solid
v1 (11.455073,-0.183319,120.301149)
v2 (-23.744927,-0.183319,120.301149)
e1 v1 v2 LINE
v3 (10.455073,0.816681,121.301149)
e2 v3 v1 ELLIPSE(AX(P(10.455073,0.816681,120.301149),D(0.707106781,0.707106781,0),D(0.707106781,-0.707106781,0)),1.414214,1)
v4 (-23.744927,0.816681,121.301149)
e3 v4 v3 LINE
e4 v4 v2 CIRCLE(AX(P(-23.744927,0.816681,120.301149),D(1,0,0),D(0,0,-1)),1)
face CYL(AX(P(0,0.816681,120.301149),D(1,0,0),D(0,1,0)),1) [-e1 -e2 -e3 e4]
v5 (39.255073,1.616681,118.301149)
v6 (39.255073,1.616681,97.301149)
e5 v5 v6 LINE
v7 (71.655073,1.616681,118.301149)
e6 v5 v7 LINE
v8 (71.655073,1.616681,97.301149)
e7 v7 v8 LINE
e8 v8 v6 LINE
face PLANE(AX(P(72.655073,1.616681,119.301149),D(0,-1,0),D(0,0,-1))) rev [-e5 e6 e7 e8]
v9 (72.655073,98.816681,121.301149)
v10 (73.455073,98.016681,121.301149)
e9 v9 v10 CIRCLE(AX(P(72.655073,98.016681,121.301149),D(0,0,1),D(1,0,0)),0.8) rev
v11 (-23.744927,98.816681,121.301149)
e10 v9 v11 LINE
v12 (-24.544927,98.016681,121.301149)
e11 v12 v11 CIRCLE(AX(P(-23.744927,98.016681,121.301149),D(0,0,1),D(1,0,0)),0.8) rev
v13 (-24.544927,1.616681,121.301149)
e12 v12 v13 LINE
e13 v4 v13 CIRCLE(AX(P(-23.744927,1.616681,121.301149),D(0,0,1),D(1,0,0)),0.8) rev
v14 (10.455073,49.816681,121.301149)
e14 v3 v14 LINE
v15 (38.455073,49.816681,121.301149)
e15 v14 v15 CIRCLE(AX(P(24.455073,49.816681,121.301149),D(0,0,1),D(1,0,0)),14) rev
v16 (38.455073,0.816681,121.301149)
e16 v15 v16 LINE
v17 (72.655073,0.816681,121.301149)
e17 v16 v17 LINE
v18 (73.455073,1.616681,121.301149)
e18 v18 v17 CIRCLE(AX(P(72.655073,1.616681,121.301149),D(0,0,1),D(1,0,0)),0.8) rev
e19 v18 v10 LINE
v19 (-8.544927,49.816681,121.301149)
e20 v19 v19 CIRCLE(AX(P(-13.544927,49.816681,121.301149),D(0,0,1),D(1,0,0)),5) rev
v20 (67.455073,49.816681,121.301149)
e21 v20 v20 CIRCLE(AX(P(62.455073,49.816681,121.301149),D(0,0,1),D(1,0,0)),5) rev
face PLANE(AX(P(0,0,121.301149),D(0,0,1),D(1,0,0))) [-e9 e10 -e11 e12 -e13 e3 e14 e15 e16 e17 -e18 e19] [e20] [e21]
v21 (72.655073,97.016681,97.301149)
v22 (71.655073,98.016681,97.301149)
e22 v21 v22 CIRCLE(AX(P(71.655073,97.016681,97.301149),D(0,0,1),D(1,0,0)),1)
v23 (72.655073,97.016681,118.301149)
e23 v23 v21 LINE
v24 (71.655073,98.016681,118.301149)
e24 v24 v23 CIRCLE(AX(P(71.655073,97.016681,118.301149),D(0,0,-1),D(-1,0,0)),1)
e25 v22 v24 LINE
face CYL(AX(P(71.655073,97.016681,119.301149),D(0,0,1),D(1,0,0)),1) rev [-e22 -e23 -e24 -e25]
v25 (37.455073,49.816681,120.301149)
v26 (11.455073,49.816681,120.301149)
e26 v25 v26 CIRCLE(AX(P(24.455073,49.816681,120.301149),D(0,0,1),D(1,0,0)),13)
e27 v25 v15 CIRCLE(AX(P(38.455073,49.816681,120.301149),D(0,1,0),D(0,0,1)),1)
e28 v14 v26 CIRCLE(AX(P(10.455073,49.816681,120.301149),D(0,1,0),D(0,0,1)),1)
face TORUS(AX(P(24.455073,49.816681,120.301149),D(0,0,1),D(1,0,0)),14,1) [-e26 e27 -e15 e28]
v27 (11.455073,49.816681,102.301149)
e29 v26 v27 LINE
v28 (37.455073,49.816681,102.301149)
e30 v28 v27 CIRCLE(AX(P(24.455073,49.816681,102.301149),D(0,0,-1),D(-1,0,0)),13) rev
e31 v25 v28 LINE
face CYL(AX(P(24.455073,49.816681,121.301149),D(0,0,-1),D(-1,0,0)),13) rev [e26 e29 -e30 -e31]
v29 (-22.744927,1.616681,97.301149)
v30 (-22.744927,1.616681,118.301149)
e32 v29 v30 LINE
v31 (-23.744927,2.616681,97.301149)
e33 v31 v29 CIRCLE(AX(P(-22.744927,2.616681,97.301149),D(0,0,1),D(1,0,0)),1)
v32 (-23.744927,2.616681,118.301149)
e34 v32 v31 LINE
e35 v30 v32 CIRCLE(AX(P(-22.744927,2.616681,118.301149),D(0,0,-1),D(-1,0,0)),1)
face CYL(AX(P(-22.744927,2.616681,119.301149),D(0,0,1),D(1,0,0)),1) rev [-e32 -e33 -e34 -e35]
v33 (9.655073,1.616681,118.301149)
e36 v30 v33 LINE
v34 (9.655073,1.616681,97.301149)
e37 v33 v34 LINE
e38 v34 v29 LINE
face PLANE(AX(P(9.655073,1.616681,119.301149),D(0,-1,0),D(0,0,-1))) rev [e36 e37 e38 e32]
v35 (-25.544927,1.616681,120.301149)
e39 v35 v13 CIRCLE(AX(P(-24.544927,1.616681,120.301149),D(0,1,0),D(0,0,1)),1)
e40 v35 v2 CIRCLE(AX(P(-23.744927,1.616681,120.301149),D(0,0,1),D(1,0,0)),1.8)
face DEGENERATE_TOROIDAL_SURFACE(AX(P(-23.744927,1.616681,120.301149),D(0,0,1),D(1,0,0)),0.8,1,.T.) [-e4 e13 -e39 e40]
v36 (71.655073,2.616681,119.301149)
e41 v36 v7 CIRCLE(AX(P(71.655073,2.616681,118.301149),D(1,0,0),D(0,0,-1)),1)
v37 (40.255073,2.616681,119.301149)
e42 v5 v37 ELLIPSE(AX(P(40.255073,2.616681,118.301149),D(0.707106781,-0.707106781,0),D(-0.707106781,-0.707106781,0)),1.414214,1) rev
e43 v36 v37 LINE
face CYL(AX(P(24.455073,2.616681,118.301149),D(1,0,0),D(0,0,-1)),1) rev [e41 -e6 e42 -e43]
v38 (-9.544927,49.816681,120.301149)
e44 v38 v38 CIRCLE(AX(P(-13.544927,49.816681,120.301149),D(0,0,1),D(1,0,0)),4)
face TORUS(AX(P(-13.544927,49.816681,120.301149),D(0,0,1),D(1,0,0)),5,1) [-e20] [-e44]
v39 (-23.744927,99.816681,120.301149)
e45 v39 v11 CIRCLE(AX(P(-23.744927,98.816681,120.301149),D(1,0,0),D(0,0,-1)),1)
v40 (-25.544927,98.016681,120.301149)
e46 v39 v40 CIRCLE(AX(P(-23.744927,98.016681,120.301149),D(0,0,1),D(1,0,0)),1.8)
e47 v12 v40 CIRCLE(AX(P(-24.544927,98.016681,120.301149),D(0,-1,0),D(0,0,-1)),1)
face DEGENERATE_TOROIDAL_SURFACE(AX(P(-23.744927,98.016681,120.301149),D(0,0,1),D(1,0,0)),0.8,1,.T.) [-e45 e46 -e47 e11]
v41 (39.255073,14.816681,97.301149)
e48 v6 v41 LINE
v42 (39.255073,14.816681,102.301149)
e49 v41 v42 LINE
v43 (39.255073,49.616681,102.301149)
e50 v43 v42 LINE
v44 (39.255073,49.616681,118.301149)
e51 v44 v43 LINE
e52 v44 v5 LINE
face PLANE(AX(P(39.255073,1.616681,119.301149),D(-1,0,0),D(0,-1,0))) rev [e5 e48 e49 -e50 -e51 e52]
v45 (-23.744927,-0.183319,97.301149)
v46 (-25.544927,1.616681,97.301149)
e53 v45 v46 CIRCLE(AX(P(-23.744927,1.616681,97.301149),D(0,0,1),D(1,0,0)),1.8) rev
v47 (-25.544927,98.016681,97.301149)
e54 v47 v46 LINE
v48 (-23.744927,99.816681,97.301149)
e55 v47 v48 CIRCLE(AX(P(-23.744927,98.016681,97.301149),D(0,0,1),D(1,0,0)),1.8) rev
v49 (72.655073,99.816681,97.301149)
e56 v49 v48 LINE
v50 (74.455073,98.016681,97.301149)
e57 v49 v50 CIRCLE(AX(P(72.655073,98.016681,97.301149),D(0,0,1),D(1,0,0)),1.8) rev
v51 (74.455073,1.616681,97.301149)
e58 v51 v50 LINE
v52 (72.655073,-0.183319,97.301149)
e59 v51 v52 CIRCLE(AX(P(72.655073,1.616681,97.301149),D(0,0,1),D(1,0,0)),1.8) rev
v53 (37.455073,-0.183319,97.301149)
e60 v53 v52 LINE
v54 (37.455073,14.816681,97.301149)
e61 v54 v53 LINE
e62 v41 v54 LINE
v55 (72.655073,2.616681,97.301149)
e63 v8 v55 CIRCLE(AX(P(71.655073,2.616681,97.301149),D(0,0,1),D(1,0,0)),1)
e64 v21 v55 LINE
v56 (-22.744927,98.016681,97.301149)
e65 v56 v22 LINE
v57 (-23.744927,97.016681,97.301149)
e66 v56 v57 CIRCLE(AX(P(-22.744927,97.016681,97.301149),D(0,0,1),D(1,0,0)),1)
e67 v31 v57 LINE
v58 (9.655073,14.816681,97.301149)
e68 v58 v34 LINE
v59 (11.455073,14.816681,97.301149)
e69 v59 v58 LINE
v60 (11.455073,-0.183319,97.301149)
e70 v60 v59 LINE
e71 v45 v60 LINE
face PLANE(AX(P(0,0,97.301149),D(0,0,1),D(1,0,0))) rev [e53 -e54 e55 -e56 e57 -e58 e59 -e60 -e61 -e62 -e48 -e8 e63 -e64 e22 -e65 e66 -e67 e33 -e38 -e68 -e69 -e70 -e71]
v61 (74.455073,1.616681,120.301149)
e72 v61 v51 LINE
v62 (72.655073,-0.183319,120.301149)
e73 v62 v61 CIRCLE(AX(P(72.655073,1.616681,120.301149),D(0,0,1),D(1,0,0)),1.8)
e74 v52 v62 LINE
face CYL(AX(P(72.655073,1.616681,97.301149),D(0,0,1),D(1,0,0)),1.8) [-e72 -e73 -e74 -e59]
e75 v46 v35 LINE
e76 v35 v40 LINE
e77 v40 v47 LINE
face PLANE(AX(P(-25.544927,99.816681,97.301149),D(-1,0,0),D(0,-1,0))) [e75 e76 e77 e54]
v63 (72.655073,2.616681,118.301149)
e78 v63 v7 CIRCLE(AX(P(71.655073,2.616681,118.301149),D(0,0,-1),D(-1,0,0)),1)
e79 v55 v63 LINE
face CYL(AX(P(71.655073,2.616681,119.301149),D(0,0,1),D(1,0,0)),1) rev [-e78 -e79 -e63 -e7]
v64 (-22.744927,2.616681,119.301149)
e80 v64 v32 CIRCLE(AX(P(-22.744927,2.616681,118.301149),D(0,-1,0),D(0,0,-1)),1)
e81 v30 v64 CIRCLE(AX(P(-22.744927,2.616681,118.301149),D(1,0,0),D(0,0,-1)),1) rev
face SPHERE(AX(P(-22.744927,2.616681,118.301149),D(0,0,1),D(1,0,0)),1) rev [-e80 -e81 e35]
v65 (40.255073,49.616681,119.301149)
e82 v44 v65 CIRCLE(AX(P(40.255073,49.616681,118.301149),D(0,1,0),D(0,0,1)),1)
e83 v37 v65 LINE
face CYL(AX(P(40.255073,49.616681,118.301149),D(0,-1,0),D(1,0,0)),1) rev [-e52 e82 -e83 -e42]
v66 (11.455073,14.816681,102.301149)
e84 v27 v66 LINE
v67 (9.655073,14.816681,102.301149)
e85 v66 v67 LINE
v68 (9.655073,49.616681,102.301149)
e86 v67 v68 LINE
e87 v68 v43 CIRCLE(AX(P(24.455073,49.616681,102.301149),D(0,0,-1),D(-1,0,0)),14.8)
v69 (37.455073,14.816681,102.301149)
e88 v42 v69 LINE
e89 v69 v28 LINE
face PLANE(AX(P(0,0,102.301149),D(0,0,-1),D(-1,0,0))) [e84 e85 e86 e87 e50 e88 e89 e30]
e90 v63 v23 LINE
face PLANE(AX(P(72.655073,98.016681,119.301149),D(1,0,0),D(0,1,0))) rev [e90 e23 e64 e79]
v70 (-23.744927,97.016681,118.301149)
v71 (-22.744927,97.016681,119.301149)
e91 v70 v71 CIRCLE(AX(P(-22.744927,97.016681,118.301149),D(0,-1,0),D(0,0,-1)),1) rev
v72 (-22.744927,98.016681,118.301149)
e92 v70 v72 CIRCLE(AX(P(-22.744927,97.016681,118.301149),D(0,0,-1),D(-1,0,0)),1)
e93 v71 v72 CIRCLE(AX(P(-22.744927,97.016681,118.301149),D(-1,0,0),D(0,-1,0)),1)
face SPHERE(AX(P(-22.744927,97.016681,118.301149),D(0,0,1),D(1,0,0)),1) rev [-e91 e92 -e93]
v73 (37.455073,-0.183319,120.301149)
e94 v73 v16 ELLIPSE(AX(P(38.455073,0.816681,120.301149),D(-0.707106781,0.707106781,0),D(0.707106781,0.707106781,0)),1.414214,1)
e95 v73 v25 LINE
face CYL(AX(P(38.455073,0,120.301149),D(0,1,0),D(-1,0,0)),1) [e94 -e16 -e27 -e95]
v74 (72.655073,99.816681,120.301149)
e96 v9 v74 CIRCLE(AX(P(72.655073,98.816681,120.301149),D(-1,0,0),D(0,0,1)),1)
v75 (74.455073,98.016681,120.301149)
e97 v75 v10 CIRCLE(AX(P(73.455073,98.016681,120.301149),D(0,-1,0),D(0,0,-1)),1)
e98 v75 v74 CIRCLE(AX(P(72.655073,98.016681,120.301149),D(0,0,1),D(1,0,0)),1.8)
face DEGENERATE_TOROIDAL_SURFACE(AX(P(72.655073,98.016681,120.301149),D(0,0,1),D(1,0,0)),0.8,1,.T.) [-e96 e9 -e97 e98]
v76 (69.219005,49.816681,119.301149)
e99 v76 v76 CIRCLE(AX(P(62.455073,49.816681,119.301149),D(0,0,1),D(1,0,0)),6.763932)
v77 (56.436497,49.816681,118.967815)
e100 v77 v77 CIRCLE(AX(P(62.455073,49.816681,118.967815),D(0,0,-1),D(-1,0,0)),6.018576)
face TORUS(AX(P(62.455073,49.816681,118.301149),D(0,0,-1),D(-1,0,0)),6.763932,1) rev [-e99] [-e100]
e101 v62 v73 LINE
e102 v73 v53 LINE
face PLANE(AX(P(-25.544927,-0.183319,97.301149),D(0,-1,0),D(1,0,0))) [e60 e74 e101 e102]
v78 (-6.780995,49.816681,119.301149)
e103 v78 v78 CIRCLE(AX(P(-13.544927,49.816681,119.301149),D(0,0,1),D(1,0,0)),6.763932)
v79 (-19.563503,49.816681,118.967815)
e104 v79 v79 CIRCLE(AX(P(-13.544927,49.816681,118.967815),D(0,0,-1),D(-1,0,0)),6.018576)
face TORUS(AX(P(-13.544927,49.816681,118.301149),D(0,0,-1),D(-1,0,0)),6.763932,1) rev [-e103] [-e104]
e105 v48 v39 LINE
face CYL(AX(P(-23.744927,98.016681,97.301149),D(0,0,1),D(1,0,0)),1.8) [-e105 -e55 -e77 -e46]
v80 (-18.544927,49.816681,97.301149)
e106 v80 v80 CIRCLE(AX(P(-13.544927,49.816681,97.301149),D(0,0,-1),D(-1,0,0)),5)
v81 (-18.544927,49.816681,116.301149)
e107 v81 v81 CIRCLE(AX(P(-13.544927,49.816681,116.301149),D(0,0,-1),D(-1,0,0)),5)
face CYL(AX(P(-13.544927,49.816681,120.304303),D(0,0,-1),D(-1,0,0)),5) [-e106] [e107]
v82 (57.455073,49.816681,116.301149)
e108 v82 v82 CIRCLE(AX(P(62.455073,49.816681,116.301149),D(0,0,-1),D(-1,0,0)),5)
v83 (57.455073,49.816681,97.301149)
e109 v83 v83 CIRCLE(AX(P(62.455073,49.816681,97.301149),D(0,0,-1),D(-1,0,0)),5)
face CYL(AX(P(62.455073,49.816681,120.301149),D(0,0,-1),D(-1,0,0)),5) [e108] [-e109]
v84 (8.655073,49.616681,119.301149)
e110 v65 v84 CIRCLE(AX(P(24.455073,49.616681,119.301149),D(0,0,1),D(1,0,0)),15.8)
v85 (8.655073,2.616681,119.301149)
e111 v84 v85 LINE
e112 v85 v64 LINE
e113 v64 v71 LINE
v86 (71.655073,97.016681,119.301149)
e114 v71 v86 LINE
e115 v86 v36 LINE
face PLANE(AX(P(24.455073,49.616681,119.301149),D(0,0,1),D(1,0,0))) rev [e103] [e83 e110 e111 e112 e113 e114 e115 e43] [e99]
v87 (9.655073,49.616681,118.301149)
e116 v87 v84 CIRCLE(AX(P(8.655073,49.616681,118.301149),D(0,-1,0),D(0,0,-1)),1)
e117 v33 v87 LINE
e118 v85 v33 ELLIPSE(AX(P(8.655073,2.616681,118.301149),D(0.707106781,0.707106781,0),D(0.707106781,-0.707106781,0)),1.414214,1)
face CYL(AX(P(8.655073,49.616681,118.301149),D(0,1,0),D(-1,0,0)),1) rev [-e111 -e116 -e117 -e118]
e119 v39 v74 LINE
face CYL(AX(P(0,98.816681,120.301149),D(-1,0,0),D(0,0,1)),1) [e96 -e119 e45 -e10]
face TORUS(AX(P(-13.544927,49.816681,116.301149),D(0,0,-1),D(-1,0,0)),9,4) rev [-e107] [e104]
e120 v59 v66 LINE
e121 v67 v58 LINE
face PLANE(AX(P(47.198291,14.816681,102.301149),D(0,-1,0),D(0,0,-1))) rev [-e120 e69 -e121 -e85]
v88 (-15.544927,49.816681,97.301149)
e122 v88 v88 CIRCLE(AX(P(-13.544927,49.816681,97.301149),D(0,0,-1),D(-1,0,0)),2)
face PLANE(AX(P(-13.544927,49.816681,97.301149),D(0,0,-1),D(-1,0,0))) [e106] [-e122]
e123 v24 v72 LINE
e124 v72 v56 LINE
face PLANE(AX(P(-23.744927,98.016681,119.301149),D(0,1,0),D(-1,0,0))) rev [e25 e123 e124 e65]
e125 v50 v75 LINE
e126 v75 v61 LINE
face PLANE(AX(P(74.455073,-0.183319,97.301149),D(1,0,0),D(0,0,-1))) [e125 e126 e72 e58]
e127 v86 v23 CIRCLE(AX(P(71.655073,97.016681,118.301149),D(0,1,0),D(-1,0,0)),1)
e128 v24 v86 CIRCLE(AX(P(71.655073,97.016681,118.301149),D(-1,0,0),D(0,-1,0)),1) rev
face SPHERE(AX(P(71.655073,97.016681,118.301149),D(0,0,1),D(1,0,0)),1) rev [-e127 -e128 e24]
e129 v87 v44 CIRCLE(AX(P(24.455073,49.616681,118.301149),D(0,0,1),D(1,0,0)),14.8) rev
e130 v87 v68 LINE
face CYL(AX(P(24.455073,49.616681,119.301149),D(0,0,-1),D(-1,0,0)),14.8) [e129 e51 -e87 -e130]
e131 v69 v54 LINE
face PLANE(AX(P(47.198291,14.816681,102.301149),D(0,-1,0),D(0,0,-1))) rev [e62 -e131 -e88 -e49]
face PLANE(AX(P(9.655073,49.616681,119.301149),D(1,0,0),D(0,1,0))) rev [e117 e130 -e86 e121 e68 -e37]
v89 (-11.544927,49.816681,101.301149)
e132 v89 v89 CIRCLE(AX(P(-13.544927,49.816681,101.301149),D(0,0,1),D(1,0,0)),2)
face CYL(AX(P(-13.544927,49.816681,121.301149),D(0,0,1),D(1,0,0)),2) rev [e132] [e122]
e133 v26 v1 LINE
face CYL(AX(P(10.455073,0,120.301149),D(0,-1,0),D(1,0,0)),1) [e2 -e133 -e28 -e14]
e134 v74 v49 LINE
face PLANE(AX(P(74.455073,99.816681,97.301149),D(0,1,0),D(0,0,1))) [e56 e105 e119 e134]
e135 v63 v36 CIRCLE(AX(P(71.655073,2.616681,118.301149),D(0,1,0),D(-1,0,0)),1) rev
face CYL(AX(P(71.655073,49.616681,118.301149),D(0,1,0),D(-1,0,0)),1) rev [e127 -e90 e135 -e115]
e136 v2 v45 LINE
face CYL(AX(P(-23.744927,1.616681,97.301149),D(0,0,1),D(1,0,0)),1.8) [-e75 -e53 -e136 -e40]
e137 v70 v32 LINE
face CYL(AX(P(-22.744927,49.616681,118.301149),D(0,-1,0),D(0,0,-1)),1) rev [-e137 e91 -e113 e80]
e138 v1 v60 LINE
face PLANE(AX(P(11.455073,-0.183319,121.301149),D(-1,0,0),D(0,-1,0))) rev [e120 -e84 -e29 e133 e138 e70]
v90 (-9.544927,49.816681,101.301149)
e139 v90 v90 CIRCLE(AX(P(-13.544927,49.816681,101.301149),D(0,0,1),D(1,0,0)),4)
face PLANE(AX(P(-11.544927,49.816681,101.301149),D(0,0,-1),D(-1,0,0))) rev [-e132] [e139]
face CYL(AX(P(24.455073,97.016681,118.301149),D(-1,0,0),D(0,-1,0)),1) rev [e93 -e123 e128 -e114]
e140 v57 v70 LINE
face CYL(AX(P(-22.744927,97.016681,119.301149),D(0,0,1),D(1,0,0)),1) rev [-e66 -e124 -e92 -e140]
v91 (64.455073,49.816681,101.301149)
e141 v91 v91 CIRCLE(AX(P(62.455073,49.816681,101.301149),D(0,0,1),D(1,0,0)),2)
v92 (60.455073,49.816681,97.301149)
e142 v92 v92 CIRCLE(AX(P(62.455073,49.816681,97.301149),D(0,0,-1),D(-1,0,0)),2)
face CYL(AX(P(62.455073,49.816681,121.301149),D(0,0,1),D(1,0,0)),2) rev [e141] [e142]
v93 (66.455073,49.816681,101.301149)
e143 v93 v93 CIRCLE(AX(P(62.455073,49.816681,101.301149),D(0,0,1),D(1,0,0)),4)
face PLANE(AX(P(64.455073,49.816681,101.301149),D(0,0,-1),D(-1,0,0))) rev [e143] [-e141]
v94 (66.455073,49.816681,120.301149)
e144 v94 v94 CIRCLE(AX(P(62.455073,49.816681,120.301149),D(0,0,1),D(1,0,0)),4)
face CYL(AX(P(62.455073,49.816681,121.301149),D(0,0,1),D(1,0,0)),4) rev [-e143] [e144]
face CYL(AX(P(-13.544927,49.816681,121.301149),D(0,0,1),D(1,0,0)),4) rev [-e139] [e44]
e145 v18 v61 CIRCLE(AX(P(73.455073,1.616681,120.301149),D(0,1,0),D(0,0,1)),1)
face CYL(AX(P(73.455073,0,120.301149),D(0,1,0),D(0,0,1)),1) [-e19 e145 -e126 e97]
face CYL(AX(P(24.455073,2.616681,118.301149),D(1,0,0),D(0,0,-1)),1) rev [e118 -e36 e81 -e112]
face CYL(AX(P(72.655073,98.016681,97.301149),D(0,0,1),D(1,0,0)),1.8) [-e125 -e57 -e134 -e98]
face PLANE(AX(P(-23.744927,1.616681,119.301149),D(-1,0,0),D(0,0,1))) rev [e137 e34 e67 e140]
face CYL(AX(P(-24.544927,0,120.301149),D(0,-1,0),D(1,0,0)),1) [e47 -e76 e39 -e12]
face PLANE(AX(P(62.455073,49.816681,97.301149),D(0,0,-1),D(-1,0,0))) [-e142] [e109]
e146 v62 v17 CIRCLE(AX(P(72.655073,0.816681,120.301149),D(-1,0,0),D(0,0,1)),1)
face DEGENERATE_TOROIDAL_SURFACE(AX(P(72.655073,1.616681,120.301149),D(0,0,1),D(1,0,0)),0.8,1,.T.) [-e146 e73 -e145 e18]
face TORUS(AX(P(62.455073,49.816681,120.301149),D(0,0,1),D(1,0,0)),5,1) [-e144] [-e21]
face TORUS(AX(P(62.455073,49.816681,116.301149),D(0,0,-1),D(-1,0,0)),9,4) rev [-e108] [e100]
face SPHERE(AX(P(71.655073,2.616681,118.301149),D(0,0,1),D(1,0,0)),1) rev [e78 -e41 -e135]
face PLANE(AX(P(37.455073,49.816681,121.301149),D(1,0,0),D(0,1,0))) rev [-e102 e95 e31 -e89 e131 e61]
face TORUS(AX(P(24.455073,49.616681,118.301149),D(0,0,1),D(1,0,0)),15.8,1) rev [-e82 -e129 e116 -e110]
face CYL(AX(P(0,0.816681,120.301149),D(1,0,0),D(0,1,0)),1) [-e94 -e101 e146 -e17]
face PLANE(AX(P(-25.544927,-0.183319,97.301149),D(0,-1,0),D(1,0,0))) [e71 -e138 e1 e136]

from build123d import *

# Parameters (mm, degrees)
SKETCH1_W           = 100
SKETCH1_H           = 100
BOSS_EXTRUDE1_DEPTH = 24
CUT_EXTRUDE1_DEPTH  = 127.818483233
CUT_EXTRUDE2_DEPTH  = 22
HOLE1_D             = 4
HOLE1_DEPTH         = 40
HOLE1_CBORE_D       = 8
HOLE1_CBORE_DEPTH   = 20
FILLET5_R           = 1
FILLET6_R           = 1
FILLET7_R           = 1.8
SKETCH10_W          = 46.470939908
SKETCH10_H          = 57.057613345
CUT_EXTRUDE4_DEPTH  = 5
FILLET8_R           = 1


with BuildPart() as part:
    # Sketch1 → Boss-Extrude1 (new body)
    with BuildSketch(Plane.XY.offset(121.301148811)):
        with Locations((24.455072694, 49.816681169)):
            Rectangle(SKETCH1_W, SKETCH1_H)
    extrude(amount=-BOSS_EXTRUDE1_DEPTH)

    # Sketch2 → Cut-Extrude1 (cut, through all)
    with BuildSketch(Plane(origin=(0, 0, 97.301148811), x_dir=(-1, 0, 0), z_dir=(0, 0, -1))):
        with BuildLine():
            Line((-37.455072694, -0.183318831), (-11.455072694, -0.183318831))
            Line((-11.455072694, -0.183318831), (-11.455072694, 49.816681169))
            ThreePointArc((-11.455072694, 49.816681169), (-24.455072694, 62.816681169), (-37.455072694, 49.816681169))
            Line((-37.455072694, 49.816681169), (-37.455072694, -0.183318831))
        make_face()
    extrude(amount=-CUT_EXTRUDE1_DEPTH, mode=Mode.SUBTRACT)

    # Sketch3 → Cut-Extrude2 (cut)
    with BuildSketch(Plane(origin=(0, 0, 97.301148811), x_dir=(-1, 0, 0), z_dir=(0, 0, -1))):
        with BuildLine():
            Line((-39.255072694, 1.616681169), (-39.255072694, 49.616681169))
            ThreePointArc((-39.255072694, 49.616681169), (-24.455072694, 64.416681169), (-9.655072694, 49.616681169))
            Line((-9.655072694, 49.616681169), (-9.655072694, 1.616681169))
            Line((-9.655072694, 1.616681169), (23.744927306, 1.616681169))
            Line((23.744927306, 1.616681169), (23.744927306, 98.016681169))
            Line((23.744927306, 98.016681169), (-72.655072694, 98.016681169))
            Line((-72.655072694, 98.016681169), (-72.655072694, 1.616681169))
            Line((-72.655072694, 1.616681169), (-39.255072694, 1.616681169))
        make_face()
    extrude(amount=-CUT_EXTRUDE2_DEPTH, mode=Mode.SUBTRACT)

    # Sketch4 → Revolve1 (revolve)
    with BuildSketch(Plane.XZ.offset(-49.816681169), mode=Mode.PRIVATE) as revolve1_sk:
        with BuildLine():
            Line((71.455072694, 120.301148811), (62.455072694, 120.301148811))
            Line((62.455072694, 120.301148811), (62.455072694, 97.301148811))
            Line((62.455072694, 97.301148811), (67.455072694, 97.301148811))
            Line((67.455072694, 97.301148811), (67.455072694, 116.301148811))
            ThreePointArc((67.455072694, 116.301148811), (68.626645569, 119.129575936), (71.455072694, 120.301148811))
        make_face()
    revolve(revolve1_sk.sketch.rotate(Axis((62.455072694, 49.816681169, 120.301148811), (0, 0, -1)), 180), axis=Axis((62.455072694, 49.816681169, 120.301148811), (0, 0, -1)))

    # Sketch5 → Revolve2 (revolve)
    with BuildSketch(Plane.XZ.offset(-49.816681169), mode=Mode.PRIVATE) as revolve2_sk:
        with BuildLine():
            Line((-4.544927306, 120.301148811), (-13.544927306, 120.301148811))
            Line((-13.544927306, 120.301148811), (-13.544927306, 97.301148811))
            Line((-13.544927306, 97.301148811), (-8.544927306, 97.301148811))
            Line((-8.544927306, 97.301148811), (-8.544927306, 116.301148811))
            ThreePointArc((-8.544927306, 116.301148811), (-7.373354431, 119.129575936), (-4.544927306, 120.301148811))
        make_face()
    revolve(revolve2_sk.sketch.rotate(Axis((-13.544927306, 49.816681169, 120.304302605), (0, 0, -1)), 180), axis=Axis((-13.544927306, 49.816681169, 120.304302605), (0, 0, -1)))

    # Hole1
    with Locations(Plane.XY.offset(121.301148811)):
        with Locations((-13.544927306, 49.816681169), (62.455072694, 49.816681169)):
            CounterBoreHole(HOLE1_D / 2, HOLE1_CBORE_D / 2, HOLE1_CBORE_DEPTH, depth=HOLE1_DEPTH)

    # Fillet5
    fillet5_edges = [part.edges().sort_by_distance(p)[0] for p in [
        (55.955072694, 1.616681169, 119.301148811),
        (72.655072694, 49.816681169, 119.301148811),
        (24.455072694, 98.016681169, 119.301148811),
        (-23.744927306, 49.816681169, 119.301148811),
        (-7.044927306, 1.616681169, 119.301148811),
        (9.655072694, 25.616681169, 119.301148811),
        (24.455072694, 64.416681169, 119.301148811),
        (39.255072694, 25.616681169, 119.301148811),
        (68.809321383, 49.816681169, 119.301148811),
        (-7.190678617, 49.816681169, 119.301148811),
    ]]
    fillet(fillet5_edges, radius=FILLET5_R)

    # Fillet6
    fillet6_edges = [part.edges().sort_by_distance(p)[0] for p in [
        (55.955072694, -0.183318831, 121.301148811),
        (37.455072694, 24.816681169, 121.301148811),
        (24.455072694, 62.816681169, 121.301148811),
        (11.455072694, 24.816681169, 121.301148811),
        (74.455072694, 49.816681169, 121.301148811),
        (-7.044927306, -0.183318831, 121.301148811),
        (-25.544927306, 49.816681169, 121.301148811),
        (24.455072694, 99.816681169, 121.301148811),
        (58.455072694, 49.816681169, 121.301148811),
        (-17.544927306, 49.816681169, 121.301148811),
    ]]
    fillet(fillet6_edges, radius=FILLET6_R)

    # Fillet7
    # the kernel refuses this fillet: 1.8 mm, written as the material it takes off along each edge
    with BuildSketch(Plane(origin=(-23.744927306, 98.016681169, 121.301148811), x_dir=(0, 1, 0), z_dir=(1, 0, 0))) as fillet7_piece_1:
        with BuildLine():
            CenterArc((0.8, -1), 1, 0, 90)
            Line((1.8, -1), (1.8, 0))
            Line((1.8, 0), (0.8, 0))
        make_face()
    revolve(axis=Axis((-23.744927306, 98.016681169, 121.301148811), (0, 0, 1)), revolution_arc=90, mode=Mode.SUBTRACT)
    with BuildSketch(Plane(origin=(72.655072694, 98.016681169, 121.301148811), x_dir=(1, 0, 0), z_dir=(0, -1, 0))) as fillet7_piece_2:
        with BuildLine():
            CenterArc((0.8, -1), 1, 0, 90)
            Line((1.8, -1), (1.8, 0))
            Line((1.8, 0), (0.8, 0))
        make_face()
    revolve(axis=Axis((72.655072694, 98.016681169, 121.301148811), (0, 0, 1)), revolution_arc=90, mode=Mode.SUBTRACT)
    with BuildSketch(Plane(origin=(-23.744927306, 1.616681169, 121.301148811), x_dir=(-1, 0, 0), z_dir=(0, 1, 0))) as fillet7_piece_3:
        with BuildLine():
            CenterArc((0.8, -1), 1, 0, 90)
            Line((1.8, -1), (1.8, 0))
            Line((1.8, 0), (0.8, 0))
        make_face()
    revolve(axis=Axis((-23.744927306, 1.616681169, 121.301148811), (0, 0, 1)), revolution_arc=90, mode=Mode.SUBTRACT)
    with BuildSketch(Plane(origin=(72.655072694, 1.616681169, 121.301148811), x_dir=(0, -1, 0), z_dir=(-1, 0, 0))) as fillet7_piece_4:
        with BuildLine():
            CenterArc((0.8, -1), 1, 0, 90)
            Line((1.8, -1), (1.8, 0))
            Line((1.8, 0), (0.8, 0))
        make_face()
    revolve(axis=Axis((72.655072694, 1.616681169, 121.301148811), (0, 0, 1)), revolution_arc=90, mode=Mode.SUBTRACT)
    with BuildSketch(Plane(origin=(74.455072694, 99.816681169, 121.301148811), x_dir=(-1, 0, 0), z_dir=(0, 0, -1)), Plane(origin=(74.455072694, -0.183318831, 121.301148811), x_dir=(0, 1, 0), z_dir=(0, 0, -1))) as fillet7_piece_5:
        with BuildLine():
            CenterArc((FILLET7_R, -FILLET7_R), FILLET7_R, 90, 90)
            Line((0, -FILLET7_R), (0, 0))
            Line((0, 0), (FILLET7_R, 0))
        make_face()
    extrude(amount=28.5, mode=Mode.SUBTRACT)
    with BuildSketch(Plane(origin=(-25.544927306, -0.183318831, 121.301148811), x_dir=(0, 1, 0), z_dir=(0, 0, -1)), Plane(origin=(-25.544927306, 99.816681169, 121.301148811), x_dir=(1, 0, 0), z_dir=(0, 0, -1))) as fillet7_piece_6:
        with BuildLine():
            CenterArc((FILLET7_R, FILLET7_R), FILLET7_R, 180, 90)
            Line((0, FILLET7_R), (0, 0))
            Line((0, 0), (FILLET7_R, 0))
        make_face()
    extrude(amount=28.5, mode=Mode.SUBTRACT)

    # Sketch10 → Cut-Extrude4 (cut)
    with BuildSketch(Plane(origin=(0, 0, 97.301148811), x_dir=(-1, 0, 0), z_dir=(0, 0, -1))):
        with Locations((-23.962820944, 43.345487842)):
            Rectangle(SKETCH10_W, SKETCH10_H)
    extrude(amount=-CUT_EXTRUDE4_DEPTH, mode=Mode.SUBTRACT)

    # Fillet8
    # the kernel refuses this fillet: 1 mm, written as the material it adds along each edge
    with BuildSketch(Plane(origin=(-22.744927306, 2.616681169, 118.301148811), x_dir=(0, -1, 0), z_dir=(-1, 0, 0))) as fillet8_piece_1_section:
        Polygon((0, 0), (FILLET8_R, 0), (FILLET8_R, FILLET8_R), (0, FILLET8_R), align=None)
    fillet8_piece_1 = extrude(amount=FILLET8_R, mode=Mode.PRIVATE)
    fillet8_piece_1 = fillet8_piece_1 - Plane(origin=(-22.744927306, 2.616681169, 118.301148811), x_dir=(0, 0.7071067811865475, -0.7071067811865475), z_dir=(-1, 0, 0)) * Sphere(FILLET8_R, mode=Mode.PRIVATE)
    add(fillet8_piece_1)
    with BuildSketch(Plane(origin=(-22.744927306, 97.016681169, 118.301148811), x_dir=(-1, 0, 0), z_dir=(0, 1, 0))) as fillet8_piece_2_section:
        Polygon((0, 0), (FILLET8_R, 0), (FILLET8_R, FILLET8_R), (0, FILLET8_R), align=None)
    fillet8_piece_2 = extrude(amount=FILLET8_R, mode=Mode.PRIVATE)
    fillet8_piece_2 = fillet8_piece_2 - Plane(origin=(-22.744927306, 97.016681169, 118.301148811), x_dir=(0.7071067811865475, 0, -0.7071067811865475), z_dir=(0, 1, 0)) * Sphere(FILLET8_R, mode=Mode.PRIVATE)
    add(fillet8_piece_2)
    with BuildSketch(Plane(origin=(71.655072694, 97.016681169, 118.301148811), x_dir=(0, 1, 0), z_dir=(1, 0, 0))) as fillet8_piece_3_section:
        Polygon((0, 0), (FILLET8_R, 0), (FILLET8_R, FILLET8_R), (0, FILLET8_R), align=None)
    fillet8_piece_3 = extrude(amount=FILLET8_R, mode=Mode.PRIVATE)
    fillet8_piece_3 = fillet8_piece_3 - Plane(origin=(71.655072694, 97.016681169, 118.301148811), x_dir=(0, -0.7071067811865475, -0.7071067811865475), z_dir=(1, 0, 0)) * Sphere(FILLET8_R, mode=Mode.PRIVATE)
    add(fillet8_piece_3)
    with BuildSketch(Plane(origin=(71.655072694, 2.616681169, 118.301148811), x_dir=(1, 0, 0), z_dir=(0, -1, 0))) as fillet8_piece_4_section:
        Polygon((0, 0), (FILLET8_R, 0), (FILLET8_R, FILLET8_R), (0, FILLET8_R), align=None)
    fillet8_piece_4 = extrude(amount=FILLET8_R, mode=Mode.PRIVATE)
    fillet8_piece_4 = fillet8_piece_4 - Plane(origin=(71.655072694, 2.616681169, 118.301148811), x_dir=(-0.7071067811865475, 0, -0.7071067811865475), z_dir=(0, -1, 0)) * Sphere(FILLET8_R, mode=Mode.PRIVATE)
    add(fillet8_piece_4)
    with BuildSketch(Plane(origin=(72.655072694, 1.616681169, 97.301148811), x_dir=(-1, 0, 0), z_dir=(0, 0, 1)), Plane(origin=(72.655072694, 98.016681169, 97.301148811), x_dir=(0, -1, 0), z_dir=(0, 0, 1)), Plane(origin=(-23.744927306, 98.016681169, 97.301148811), x_dir=(1, 0, 0), z_dir=(0, 0, 1)), Plane(origin=(-23.744927306, 1.616681169, 97.301148811), x_dir=(0, 1, 0), z_dir=(0, 0, 1))) as fillet8_piece_5:
        with BuildLine():
            CenterArc((FILLET8_R, -FILLET8_R), FILLET8_R, 90, 90)
            Line((0, -FILLET8_R), (0, 0))
            Line((0, 0), (FILLET8_R, 0))
        make_face()
    extrude(amount=21)


solid = part.part
